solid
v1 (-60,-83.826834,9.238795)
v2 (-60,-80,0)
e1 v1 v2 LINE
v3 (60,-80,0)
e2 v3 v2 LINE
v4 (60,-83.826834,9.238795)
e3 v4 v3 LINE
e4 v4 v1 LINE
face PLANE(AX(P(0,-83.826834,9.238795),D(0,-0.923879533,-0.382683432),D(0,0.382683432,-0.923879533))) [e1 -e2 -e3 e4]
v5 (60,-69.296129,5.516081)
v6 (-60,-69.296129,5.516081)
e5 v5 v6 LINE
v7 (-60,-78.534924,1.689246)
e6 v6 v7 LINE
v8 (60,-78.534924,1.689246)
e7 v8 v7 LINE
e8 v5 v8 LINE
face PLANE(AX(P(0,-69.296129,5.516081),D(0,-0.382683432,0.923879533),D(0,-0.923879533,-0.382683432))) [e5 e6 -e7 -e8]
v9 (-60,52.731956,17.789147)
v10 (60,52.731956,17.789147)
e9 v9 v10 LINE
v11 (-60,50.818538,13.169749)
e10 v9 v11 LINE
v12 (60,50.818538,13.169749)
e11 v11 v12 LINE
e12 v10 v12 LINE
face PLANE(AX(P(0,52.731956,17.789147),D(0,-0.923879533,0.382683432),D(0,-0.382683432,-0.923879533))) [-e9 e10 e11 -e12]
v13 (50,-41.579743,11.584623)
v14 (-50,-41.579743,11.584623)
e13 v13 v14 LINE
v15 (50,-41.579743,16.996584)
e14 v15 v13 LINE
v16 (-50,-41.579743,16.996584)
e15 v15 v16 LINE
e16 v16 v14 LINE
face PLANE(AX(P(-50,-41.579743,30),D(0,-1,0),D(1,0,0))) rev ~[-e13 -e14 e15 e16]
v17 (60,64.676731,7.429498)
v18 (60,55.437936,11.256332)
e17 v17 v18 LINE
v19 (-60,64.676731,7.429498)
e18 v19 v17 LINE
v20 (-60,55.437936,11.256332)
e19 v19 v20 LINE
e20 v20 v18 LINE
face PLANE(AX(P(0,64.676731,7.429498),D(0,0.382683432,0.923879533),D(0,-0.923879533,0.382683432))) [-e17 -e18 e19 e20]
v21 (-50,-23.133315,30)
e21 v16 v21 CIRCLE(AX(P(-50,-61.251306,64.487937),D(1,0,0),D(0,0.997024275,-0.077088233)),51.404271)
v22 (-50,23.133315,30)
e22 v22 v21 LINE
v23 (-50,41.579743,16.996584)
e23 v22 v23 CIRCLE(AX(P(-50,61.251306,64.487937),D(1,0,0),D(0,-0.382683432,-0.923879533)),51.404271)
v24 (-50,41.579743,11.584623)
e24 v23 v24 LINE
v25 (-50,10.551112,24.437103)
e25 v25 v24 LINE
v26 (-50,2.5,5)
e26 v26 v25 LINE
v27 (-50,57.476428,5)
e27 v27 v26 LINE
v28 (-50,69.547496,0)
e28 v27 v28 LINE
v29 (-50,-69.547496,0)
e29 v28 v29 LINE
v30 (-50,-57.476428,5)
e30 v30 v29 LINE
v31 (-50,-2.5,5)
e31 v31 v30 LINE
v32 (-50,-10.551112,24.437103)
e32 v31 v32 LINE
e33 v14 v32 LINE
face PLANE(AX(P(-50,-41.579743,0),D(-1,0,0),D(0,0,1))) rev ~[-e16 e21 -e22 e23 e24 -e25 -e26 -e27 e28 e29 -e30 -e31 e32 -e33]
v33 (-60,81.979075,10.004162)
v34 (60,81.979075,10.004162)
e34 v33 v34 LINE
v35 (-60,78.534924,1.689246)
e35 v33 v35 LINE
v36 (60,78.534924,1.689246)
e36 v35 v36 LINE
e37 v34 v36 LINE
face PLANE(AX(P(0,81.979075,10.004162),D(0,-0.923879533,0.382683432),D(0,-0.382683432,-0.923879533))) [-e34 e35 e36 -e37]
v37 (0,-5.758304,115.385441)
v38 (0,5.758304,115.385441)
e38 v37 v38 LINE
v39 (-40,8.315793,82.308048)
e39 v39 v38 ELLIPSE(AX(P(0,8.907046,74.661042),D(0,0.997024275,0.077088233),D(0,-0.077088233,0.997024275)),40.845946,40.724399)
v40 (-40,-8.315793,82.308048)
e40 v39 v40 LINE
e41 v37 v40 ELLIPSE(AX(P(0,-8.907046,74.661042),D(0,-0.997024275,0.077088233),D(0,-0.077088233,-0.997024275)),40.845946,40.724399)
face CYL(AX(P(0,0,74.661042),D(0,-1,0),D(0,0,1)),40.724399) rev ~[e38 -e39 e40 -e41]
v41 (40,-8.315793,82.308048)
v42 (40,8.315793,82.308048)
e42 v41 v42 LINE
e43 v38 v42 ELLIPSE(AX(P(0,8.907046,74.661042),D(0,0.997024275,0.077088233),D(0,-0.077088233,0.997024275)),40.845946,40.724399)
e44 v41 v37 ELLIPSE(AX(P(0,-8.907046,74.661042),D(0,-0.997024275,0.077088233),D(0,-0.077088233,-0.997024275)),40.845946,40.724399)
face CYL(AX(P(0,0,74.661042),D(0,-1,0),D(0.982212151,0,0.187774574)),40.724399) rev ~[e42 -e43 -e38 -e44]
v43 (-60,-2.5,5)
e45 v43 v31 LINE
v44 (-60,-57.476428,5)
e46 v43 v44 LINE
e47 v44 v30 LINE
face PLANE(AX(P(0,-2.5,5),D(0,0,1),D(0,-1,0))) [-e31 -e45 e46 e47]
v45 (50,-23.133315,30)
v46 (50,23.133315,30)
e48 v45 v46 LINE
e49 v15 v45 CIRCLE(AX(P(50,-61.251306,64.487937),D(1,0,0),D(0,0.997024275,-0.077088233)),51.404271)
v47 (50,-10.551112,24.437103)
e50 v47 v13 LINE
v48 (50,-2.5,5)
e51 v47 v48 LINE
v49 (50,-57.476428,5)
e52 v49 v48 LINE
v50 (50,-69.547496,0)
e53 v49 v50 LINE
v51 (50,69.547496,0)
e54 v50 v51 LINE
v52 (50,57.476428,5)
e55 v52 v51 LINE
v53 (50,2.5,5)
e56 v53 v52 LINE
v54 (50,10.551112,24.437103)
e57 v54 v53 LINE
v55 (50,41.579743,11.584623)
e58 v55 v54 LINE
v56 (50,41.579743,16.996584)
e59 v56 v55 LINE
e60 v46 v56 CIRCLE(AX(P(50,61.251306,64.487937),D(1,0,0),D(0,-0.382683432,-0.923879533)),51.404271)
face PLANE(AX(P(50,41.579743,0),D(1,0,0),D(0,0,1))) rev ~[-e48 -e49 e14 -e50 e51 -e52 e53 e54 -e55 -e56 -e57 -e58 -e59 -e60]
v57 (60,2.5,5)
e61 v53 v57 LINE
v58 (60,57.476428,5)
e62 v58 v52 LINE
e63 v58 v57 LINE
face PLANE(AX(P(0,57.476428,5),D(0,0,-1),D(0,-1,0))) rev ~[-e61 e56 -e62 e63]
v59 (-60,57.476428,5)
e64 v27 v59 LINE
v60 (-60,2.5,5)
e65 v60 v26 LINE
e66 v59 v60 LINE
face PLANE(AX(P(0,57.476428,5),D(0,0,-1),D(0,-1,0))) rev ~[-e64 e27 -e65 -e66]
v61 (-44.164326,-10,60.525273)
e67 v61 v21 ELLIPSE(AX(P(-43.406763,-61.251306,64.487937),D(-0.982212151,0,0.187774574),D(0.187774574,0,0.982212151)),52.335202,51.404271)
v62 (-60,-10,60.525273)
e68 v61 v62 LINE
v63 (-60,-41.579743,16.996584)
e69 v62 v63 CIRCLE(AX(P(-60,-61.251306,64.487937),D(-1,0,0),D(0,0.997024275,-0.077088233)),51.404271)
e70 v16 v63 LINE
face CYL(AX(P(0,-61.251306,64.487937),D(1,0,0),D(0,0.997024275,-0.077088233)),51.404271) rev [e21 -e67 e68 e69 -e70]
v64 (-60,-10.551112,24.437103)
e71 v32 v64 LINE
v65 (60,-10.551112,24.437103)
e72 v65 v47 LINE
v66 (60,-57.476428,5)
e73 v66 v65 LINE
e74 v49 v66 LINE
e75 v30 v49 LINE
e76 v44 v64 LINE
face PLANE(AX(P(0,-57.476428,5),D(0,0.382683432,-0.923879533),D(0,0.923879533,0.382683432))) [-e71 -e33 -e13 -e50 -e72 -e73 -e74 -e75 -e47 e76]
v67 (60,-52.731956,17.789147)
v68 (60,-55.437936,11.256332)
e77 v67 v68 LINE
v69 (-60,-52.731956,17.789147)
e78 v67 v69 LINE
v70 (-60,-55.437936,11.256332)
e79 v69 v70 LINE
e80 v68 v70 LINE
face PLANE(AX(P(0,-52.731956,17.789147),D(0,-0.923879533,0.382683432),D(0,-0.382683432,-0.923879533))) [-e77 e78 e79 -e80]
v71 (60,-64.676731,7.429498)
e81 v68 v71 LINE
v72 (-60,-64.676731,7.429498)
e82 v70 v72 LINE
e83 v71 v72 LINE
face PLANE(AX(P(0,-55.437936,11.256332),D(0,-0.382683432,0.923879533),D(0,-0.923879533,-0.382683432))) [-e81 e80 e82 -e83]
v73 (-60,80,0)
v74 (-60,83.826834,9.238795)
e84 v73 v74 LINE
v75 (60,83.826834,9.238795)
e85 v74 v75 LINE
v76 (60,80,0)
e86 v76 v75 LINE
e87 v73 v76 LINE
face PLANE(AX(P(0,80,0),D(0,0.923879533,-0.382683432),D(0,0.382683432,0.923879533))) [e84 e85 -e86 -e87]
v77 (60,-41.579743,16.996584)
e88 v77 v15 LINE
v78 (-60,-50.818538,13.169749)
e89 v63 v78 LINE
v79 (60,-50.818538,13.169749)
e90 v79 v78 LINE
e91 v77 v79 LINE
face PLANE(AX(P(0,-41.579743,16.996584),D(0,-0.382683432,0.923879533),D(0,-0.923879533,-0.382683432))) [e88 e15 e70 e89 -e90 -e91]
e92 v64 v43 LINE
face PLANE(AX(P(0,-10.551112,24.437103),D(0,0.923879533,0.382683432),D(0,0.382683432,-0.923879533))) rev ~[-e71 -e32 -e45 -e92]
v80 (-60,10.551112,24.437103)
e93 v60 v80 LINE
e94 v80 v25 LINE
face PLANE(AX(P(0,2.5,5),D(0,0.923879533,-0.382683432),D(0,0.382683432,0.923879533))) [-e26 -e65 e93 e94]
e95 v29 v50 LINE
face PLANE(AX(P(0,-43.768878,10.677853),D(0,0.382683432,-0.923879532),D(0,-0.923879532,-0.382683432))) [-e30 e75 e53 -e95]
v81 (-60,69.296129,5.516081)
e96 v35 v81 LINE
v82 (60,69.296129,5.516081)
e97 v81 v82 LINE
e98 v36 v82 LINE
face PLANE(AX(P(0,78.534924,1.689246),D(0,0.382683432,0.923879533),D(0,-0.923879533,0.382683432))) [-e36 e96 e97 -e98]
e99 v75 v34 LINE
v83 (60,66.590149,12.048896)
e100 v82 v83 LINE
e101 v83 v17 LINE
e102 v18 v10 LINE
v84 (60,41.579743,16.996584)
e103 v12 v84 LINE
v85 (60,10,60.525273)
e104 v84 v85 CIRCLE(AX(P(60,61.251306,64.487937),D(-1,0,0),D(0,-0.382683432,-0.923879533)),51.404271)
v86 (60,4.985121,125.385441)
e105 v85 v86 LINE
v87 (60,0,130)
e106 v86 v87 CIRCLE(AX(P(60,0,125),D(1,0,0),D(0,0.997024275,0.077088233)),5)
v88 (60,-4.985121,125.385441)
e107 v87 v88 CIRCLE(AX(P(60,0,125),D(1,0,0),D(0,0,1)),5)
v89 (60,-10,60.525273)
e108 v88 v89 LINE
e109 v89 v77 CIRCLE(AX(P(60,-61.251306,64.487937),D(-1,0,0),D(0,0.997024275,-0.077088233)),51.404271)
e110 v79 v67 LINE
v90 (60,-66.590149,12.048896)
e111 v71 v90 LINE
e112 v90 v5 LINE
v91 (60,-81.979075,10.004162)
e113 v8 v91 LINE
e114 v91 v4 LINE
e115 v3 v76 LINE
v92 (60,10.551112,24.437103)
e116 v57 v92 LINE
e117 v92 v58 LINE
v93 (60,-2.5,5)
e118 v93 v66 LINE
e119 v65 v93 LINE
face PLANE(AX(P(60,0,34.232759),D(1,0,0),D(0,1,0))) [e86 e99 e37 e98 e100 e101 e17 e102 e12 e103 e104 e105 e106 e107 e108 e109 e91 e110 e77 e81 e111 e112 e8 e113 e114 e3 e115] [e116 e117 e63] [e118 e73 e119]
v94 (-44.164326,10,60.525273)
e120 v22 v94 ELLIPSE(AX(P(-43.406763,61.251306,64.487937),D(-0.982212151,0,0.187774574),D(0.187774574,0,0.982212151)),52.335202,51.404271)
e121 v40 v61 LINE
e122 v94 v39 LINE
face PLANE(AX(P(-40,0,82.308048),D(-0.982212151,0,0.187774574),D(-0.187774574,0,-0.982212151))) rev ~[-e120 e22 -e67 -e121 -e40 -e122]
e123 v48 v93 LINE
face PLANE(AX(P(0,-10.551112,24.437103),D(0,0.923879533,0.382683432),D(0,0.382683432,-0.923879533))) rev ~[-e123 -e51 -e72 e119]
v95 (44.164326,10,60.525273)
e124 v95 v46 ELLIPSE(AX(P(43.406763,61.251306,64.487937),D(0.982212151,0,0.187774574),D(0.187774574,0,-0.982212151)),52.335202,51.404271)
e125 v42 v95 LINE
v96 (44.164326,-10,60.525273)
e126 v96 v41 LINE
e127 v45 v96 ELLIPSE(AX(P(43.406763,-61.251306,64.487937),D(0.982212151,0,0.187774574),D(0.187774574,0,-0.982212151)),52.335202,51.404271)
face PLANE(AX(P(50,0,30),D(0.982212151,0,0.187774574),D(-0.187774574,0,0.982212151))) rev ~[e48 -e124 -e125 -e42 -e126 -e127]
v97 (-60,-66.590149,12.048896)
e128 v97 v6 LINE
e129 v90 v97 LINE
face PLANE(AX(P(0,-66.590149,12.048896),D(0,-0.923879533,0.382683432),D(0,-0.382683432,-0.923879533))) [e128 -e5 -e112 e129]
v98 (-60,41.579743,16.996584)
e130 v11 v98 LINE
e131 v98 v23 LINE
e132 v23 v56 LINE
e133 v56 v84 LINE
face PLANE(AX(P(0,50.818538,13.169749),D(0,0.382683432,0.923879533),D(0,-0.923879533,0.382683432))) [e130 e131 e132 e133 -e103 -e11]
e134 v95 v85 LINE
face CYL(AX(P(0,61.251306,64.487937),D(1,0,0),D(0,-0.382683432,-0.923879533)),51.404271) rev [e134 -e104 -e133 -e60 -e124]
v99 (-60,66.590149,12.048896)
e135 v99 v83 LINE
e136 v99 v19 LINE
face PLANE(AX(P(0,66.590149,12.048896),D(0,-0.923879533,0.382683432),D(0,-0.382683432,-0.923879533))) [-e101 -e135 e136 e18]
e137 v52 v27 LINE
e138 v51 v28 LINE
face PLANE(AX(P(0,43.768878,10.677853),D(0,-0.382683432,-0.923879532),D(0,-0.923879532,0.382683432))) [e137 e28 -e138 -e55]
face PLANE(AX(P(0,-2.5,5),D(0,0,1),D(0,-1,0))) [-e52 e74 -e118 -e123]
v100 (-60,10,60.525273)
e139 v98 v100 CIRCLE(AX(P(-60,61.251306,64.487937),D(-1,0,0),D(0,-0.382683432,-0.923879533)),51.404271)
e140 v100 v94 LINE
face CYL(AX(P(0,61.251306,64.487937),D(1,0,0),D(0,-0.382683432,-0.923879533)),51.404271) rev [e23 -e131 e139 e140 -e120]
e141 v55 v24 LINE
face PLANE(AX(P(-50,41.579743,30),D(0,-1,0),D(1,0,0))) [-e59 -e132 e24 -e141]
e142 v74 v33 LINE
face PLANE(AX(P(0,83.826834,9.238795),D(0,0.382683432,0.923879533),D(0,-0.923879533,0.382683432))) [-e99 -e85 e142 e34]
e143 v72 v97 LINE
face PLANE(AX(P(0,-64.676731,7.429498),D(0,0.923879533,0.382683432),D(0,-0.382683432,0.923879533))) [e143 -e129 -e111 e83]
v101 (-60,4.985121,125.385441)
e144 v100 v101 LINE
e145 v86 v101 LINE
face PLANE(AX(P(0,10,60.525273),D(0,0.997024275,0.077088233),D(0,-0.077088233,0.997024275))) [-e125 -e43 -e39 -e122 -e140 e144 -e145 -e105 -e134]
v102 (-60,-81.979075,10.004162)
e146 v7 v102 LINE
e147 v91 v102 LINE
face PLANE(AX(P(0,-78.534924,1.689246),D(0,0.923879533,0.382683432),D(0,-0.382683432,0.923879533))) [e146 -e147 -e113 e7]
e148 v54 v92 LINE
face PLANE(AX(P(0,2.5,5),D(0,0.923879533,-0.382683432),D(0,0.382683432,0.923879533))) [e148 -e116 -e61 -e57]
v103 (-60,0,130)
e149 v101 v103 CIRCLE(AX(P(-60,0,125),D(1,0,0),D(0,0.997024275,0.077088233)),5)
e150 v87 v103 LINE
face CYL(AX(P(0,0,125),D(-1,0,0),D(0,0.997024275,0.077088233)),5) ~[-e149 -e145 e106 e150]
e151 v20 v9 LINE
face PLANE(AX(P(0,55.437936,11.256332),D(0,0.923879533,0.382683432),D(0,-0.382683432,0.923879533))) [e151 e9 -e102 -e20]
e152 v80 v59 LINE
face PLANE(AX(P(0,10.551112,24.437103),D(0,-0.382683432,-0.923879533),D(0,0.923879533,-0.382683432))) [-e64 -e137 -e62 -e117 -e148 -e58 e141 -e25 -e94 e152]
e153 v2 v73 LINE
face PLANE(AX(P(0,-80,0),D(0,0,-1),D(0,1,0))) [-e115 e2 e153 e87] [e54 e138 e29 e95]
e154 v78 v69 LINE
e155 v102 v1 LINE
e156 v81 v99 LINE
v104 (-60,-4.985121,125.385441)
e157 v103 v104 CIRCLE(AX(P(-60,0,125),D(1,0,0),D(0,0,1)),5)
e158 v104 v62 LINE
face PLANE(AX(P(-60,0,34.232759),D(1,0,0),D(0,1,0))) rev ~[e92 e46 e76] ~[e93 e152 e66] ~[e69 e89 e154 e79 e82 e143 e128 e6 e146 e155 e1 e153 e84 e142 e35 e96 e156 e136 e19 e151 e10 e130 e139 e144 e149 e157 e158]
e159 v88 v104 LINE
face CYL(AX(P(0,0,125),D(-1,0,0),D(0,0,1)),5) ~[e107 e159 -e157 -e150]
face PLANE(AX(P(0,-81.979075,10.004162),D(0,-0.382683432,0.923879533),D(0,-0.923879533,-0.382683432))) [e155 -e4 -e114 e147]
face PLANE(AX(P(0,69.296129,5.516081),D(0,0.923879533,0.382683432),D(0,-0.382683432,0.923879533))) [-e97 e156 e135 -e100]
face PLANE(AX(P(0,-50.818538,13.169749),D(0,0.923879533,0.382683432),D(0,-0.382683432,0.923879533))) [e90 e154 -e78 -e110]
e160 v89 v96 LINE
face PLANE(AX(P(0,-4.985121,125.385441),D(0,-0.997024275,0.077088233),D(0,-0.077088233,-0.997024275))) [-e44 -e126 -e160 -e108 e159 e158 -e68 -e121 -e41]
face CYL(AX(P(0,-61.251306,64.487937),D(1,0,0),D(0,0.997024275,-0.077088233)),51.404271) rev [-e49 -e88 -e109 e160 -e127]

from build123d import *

# Parameters (mm, degrees)
F1_DEPTH   = 60
F3_DEPTH   = 25
F4_W       = 100
F4_H       = 41.5797430669
F5_DEPTH   = 30.001
F5_FACE_W  = 100
F5_FACE_H  = 5
F6_REACH   = 142.3730132293
F5_FACE1_W = 100
F5_FACE1_H = 5
F7_REACH   = 142.3730132293


with BuildPart() as f1:
    # F0 (on Right) → F1 (new body, symmetric)
    with BuildSketch(Plane.YZ):
        with BuildLine():
            Line((-80, 0), (0, 0))
            Line((0, 0), (80, 0))
            Line((80, 0), (83.8268343237, 9.2387953251))
            Line((83.8268343237, 9.2387953251), (81.9790752586, 10.0041621898))
            Line((81.9790752586, 10.0041621898), (78.5349243673, 1.6892463972))
            Line((78.5349243673, 1.6892463972), (69.2961290422, 5.5160807209))
            Line((69.2961290422, 5.5160807209), (66.5901485415, 12.0488955453))
            Line((66.5901485415, 12.0488955453), (64.6767313797, 7.4294978827))
            Line((64.6767313797, 7.4294978827), (55.4379360546, 11.2563322064))
            Line((55.4379360546, 11.2563322064), (52.7319555538, 17.7891470308))
            Line((52.7319555538, 17.7891470308), (50.818538392, 13.1697493682))
            Line((50.818538392, 13.1697493682), (41.5797430669, 16.9965836918))
            ThreePointArc((41.5797430669, 16.9965836918), (19.6436139822, 34.3018638475), (10, 60.5252730432))
            Line((10, 60.5252730432), (4.9851213736, 125.3854411629))
            ThreePointArc((4.9851213736, 125.3854411629), (3.3965272107, 128.6692782543), (0, 130))
            ThreePointArc((0, 130), (-3.3965272107, 128.6692782543), (-4.9851213736, 125.3854411629))
            Line((-4.9851213736, 125.3854411629), (-10, 60.5252730432))
            ThreePointArc((-10, 60.5252730432), (-19.6436139822, 34.3018638475), (-41.5797430669, 16.9965836918))
            Line((-41.5797430669, 16.9965836918), (-50.818538392, 13.1697493682))
            Line((-50.818538392, 13.1697493682), (-52.7319555538, 17.7891470308))
            Line((-52.7319555538, 17.7891470308), (-55.4379360546, 11.2563322064))
            Line((-55.4379360546, 11.2563322064), (-64.6767313797, 7.4294978827))
            Line((-64.6767313797, 7.4294978827), (-66.5901485415, 12.0488955453))
            Line((-66.5901485415, 12.0488955453), (-69.2961290422, 5.5160807209))
            Line((-69.2961290422, 5.5160807209), (-78.5349243673, 1.6892463972))
            Line((-78.5349243673, 1.6892463972), (-81.9790752586, 10.0041621898))
            Line((-81.9790752586, 10.0041621898), (-83.8268343237, 9.2387953251))
            Line((-83.8268343237, 9.2387953251), (-80, 0))
        make_face()
        Polygon((-10.5511115466, 24.437102688), (-2.5, 5), (-57.4764284691, 5), align=None, mode=Mode.SUBTRACT)
        Polygon((57.4764284691, 5), (2.5, 5), (10.5511115466, 24.437102688), align=None, mode=Mode.SUBTRACT)
    extrude(amount=F1_DEPTH, both=True)

    # F2 (on Front) → F3 (cut, symmetric)
    with BuildSketch(Plane.XZ):
        with BuildLine():
            ThreePointArc((0, 115.3854411629), (-25.9524271926, 106.0449266507), (-40, 82.3080484491))
            Line((-40, 82.3080484491), (-50, 30))
            Line((-50, 30), (0, 30))
            Line((0, 30), (50, 30))
            Line((50, 30), (40, 82.3080484491))
            ThreePointArc((40, 82.3080484491), (25.9524271926, 106.0449266507), (0, 115.3854411629))
        make_face()
    extrude(amount=F3_DEPTH, both=True, mode=Mode.SUBTRACT)

    # F4 (on face) → F5 (cut, through all)
    with BuildSketch(Plane.XY.offset(30)):
        with Locations((0, 20.7898715334)):
            Rectangle(F4_W, F4_H)
        with Locations((0, -20.7898715334)):
            Rectangle(F4_W, F4_H)
    extrude(amount=-F5_DEPTH, mode=Mode.SUBTRACT)

    f6_end = Plane(origin=(0, 43.7688782858, 10.6778531928), x_dir=(0, -0.9238795325, 0.3826834324), z_dir=(0, -0.3826834324, -0.9238795325))
    # F5_face (on face) → F6 (cut, up to a plane its end follows)
    with BuildSketch(Plane(origin=(0, 41.5797430669, 2.5), x_dir=(1, 0, 0), z_dir=(0, -1, 0))):
        Rectangle(F5_FACE_W, F5_FACE_H)
    f6_long = extrude(amount=-F6_REACH, mode=Mode.PRIVATE)
    add(split(f6_long, bisect_by=f6_end, keep=Keep.TOP, mode=Mode.PRIVATE), mode=Mode.SUBTRACT)

    f7_end = Plane(origin=(0, -43.7688782858, 10.6778531928), x_dir=(0, -0.9238795325, -0.3826834324), z_dir=(0, 0.3826834324, -0.9238795325))
    # F5_face1 (on face) → F7 (cut, up to a plane its end follows)
    with BuildSketch(Plane(origin=(0, -41.5797430669, 2.5), x_dir=(-1, 0, 0), z_dir=(0, 1, 0))):
        Rectangle(F5_FACE1_W, F5_FACE1_H)
    f7_long = extrude(amount=-F7_REACH, mode=Mode.PRIVATE)
    add(split(f7_long, bisect_by=f7_end, keep=Keep.TOP, mode=Mode.PRIVATE), mode=Mode.SUBTRACT)


solid = f1.part
